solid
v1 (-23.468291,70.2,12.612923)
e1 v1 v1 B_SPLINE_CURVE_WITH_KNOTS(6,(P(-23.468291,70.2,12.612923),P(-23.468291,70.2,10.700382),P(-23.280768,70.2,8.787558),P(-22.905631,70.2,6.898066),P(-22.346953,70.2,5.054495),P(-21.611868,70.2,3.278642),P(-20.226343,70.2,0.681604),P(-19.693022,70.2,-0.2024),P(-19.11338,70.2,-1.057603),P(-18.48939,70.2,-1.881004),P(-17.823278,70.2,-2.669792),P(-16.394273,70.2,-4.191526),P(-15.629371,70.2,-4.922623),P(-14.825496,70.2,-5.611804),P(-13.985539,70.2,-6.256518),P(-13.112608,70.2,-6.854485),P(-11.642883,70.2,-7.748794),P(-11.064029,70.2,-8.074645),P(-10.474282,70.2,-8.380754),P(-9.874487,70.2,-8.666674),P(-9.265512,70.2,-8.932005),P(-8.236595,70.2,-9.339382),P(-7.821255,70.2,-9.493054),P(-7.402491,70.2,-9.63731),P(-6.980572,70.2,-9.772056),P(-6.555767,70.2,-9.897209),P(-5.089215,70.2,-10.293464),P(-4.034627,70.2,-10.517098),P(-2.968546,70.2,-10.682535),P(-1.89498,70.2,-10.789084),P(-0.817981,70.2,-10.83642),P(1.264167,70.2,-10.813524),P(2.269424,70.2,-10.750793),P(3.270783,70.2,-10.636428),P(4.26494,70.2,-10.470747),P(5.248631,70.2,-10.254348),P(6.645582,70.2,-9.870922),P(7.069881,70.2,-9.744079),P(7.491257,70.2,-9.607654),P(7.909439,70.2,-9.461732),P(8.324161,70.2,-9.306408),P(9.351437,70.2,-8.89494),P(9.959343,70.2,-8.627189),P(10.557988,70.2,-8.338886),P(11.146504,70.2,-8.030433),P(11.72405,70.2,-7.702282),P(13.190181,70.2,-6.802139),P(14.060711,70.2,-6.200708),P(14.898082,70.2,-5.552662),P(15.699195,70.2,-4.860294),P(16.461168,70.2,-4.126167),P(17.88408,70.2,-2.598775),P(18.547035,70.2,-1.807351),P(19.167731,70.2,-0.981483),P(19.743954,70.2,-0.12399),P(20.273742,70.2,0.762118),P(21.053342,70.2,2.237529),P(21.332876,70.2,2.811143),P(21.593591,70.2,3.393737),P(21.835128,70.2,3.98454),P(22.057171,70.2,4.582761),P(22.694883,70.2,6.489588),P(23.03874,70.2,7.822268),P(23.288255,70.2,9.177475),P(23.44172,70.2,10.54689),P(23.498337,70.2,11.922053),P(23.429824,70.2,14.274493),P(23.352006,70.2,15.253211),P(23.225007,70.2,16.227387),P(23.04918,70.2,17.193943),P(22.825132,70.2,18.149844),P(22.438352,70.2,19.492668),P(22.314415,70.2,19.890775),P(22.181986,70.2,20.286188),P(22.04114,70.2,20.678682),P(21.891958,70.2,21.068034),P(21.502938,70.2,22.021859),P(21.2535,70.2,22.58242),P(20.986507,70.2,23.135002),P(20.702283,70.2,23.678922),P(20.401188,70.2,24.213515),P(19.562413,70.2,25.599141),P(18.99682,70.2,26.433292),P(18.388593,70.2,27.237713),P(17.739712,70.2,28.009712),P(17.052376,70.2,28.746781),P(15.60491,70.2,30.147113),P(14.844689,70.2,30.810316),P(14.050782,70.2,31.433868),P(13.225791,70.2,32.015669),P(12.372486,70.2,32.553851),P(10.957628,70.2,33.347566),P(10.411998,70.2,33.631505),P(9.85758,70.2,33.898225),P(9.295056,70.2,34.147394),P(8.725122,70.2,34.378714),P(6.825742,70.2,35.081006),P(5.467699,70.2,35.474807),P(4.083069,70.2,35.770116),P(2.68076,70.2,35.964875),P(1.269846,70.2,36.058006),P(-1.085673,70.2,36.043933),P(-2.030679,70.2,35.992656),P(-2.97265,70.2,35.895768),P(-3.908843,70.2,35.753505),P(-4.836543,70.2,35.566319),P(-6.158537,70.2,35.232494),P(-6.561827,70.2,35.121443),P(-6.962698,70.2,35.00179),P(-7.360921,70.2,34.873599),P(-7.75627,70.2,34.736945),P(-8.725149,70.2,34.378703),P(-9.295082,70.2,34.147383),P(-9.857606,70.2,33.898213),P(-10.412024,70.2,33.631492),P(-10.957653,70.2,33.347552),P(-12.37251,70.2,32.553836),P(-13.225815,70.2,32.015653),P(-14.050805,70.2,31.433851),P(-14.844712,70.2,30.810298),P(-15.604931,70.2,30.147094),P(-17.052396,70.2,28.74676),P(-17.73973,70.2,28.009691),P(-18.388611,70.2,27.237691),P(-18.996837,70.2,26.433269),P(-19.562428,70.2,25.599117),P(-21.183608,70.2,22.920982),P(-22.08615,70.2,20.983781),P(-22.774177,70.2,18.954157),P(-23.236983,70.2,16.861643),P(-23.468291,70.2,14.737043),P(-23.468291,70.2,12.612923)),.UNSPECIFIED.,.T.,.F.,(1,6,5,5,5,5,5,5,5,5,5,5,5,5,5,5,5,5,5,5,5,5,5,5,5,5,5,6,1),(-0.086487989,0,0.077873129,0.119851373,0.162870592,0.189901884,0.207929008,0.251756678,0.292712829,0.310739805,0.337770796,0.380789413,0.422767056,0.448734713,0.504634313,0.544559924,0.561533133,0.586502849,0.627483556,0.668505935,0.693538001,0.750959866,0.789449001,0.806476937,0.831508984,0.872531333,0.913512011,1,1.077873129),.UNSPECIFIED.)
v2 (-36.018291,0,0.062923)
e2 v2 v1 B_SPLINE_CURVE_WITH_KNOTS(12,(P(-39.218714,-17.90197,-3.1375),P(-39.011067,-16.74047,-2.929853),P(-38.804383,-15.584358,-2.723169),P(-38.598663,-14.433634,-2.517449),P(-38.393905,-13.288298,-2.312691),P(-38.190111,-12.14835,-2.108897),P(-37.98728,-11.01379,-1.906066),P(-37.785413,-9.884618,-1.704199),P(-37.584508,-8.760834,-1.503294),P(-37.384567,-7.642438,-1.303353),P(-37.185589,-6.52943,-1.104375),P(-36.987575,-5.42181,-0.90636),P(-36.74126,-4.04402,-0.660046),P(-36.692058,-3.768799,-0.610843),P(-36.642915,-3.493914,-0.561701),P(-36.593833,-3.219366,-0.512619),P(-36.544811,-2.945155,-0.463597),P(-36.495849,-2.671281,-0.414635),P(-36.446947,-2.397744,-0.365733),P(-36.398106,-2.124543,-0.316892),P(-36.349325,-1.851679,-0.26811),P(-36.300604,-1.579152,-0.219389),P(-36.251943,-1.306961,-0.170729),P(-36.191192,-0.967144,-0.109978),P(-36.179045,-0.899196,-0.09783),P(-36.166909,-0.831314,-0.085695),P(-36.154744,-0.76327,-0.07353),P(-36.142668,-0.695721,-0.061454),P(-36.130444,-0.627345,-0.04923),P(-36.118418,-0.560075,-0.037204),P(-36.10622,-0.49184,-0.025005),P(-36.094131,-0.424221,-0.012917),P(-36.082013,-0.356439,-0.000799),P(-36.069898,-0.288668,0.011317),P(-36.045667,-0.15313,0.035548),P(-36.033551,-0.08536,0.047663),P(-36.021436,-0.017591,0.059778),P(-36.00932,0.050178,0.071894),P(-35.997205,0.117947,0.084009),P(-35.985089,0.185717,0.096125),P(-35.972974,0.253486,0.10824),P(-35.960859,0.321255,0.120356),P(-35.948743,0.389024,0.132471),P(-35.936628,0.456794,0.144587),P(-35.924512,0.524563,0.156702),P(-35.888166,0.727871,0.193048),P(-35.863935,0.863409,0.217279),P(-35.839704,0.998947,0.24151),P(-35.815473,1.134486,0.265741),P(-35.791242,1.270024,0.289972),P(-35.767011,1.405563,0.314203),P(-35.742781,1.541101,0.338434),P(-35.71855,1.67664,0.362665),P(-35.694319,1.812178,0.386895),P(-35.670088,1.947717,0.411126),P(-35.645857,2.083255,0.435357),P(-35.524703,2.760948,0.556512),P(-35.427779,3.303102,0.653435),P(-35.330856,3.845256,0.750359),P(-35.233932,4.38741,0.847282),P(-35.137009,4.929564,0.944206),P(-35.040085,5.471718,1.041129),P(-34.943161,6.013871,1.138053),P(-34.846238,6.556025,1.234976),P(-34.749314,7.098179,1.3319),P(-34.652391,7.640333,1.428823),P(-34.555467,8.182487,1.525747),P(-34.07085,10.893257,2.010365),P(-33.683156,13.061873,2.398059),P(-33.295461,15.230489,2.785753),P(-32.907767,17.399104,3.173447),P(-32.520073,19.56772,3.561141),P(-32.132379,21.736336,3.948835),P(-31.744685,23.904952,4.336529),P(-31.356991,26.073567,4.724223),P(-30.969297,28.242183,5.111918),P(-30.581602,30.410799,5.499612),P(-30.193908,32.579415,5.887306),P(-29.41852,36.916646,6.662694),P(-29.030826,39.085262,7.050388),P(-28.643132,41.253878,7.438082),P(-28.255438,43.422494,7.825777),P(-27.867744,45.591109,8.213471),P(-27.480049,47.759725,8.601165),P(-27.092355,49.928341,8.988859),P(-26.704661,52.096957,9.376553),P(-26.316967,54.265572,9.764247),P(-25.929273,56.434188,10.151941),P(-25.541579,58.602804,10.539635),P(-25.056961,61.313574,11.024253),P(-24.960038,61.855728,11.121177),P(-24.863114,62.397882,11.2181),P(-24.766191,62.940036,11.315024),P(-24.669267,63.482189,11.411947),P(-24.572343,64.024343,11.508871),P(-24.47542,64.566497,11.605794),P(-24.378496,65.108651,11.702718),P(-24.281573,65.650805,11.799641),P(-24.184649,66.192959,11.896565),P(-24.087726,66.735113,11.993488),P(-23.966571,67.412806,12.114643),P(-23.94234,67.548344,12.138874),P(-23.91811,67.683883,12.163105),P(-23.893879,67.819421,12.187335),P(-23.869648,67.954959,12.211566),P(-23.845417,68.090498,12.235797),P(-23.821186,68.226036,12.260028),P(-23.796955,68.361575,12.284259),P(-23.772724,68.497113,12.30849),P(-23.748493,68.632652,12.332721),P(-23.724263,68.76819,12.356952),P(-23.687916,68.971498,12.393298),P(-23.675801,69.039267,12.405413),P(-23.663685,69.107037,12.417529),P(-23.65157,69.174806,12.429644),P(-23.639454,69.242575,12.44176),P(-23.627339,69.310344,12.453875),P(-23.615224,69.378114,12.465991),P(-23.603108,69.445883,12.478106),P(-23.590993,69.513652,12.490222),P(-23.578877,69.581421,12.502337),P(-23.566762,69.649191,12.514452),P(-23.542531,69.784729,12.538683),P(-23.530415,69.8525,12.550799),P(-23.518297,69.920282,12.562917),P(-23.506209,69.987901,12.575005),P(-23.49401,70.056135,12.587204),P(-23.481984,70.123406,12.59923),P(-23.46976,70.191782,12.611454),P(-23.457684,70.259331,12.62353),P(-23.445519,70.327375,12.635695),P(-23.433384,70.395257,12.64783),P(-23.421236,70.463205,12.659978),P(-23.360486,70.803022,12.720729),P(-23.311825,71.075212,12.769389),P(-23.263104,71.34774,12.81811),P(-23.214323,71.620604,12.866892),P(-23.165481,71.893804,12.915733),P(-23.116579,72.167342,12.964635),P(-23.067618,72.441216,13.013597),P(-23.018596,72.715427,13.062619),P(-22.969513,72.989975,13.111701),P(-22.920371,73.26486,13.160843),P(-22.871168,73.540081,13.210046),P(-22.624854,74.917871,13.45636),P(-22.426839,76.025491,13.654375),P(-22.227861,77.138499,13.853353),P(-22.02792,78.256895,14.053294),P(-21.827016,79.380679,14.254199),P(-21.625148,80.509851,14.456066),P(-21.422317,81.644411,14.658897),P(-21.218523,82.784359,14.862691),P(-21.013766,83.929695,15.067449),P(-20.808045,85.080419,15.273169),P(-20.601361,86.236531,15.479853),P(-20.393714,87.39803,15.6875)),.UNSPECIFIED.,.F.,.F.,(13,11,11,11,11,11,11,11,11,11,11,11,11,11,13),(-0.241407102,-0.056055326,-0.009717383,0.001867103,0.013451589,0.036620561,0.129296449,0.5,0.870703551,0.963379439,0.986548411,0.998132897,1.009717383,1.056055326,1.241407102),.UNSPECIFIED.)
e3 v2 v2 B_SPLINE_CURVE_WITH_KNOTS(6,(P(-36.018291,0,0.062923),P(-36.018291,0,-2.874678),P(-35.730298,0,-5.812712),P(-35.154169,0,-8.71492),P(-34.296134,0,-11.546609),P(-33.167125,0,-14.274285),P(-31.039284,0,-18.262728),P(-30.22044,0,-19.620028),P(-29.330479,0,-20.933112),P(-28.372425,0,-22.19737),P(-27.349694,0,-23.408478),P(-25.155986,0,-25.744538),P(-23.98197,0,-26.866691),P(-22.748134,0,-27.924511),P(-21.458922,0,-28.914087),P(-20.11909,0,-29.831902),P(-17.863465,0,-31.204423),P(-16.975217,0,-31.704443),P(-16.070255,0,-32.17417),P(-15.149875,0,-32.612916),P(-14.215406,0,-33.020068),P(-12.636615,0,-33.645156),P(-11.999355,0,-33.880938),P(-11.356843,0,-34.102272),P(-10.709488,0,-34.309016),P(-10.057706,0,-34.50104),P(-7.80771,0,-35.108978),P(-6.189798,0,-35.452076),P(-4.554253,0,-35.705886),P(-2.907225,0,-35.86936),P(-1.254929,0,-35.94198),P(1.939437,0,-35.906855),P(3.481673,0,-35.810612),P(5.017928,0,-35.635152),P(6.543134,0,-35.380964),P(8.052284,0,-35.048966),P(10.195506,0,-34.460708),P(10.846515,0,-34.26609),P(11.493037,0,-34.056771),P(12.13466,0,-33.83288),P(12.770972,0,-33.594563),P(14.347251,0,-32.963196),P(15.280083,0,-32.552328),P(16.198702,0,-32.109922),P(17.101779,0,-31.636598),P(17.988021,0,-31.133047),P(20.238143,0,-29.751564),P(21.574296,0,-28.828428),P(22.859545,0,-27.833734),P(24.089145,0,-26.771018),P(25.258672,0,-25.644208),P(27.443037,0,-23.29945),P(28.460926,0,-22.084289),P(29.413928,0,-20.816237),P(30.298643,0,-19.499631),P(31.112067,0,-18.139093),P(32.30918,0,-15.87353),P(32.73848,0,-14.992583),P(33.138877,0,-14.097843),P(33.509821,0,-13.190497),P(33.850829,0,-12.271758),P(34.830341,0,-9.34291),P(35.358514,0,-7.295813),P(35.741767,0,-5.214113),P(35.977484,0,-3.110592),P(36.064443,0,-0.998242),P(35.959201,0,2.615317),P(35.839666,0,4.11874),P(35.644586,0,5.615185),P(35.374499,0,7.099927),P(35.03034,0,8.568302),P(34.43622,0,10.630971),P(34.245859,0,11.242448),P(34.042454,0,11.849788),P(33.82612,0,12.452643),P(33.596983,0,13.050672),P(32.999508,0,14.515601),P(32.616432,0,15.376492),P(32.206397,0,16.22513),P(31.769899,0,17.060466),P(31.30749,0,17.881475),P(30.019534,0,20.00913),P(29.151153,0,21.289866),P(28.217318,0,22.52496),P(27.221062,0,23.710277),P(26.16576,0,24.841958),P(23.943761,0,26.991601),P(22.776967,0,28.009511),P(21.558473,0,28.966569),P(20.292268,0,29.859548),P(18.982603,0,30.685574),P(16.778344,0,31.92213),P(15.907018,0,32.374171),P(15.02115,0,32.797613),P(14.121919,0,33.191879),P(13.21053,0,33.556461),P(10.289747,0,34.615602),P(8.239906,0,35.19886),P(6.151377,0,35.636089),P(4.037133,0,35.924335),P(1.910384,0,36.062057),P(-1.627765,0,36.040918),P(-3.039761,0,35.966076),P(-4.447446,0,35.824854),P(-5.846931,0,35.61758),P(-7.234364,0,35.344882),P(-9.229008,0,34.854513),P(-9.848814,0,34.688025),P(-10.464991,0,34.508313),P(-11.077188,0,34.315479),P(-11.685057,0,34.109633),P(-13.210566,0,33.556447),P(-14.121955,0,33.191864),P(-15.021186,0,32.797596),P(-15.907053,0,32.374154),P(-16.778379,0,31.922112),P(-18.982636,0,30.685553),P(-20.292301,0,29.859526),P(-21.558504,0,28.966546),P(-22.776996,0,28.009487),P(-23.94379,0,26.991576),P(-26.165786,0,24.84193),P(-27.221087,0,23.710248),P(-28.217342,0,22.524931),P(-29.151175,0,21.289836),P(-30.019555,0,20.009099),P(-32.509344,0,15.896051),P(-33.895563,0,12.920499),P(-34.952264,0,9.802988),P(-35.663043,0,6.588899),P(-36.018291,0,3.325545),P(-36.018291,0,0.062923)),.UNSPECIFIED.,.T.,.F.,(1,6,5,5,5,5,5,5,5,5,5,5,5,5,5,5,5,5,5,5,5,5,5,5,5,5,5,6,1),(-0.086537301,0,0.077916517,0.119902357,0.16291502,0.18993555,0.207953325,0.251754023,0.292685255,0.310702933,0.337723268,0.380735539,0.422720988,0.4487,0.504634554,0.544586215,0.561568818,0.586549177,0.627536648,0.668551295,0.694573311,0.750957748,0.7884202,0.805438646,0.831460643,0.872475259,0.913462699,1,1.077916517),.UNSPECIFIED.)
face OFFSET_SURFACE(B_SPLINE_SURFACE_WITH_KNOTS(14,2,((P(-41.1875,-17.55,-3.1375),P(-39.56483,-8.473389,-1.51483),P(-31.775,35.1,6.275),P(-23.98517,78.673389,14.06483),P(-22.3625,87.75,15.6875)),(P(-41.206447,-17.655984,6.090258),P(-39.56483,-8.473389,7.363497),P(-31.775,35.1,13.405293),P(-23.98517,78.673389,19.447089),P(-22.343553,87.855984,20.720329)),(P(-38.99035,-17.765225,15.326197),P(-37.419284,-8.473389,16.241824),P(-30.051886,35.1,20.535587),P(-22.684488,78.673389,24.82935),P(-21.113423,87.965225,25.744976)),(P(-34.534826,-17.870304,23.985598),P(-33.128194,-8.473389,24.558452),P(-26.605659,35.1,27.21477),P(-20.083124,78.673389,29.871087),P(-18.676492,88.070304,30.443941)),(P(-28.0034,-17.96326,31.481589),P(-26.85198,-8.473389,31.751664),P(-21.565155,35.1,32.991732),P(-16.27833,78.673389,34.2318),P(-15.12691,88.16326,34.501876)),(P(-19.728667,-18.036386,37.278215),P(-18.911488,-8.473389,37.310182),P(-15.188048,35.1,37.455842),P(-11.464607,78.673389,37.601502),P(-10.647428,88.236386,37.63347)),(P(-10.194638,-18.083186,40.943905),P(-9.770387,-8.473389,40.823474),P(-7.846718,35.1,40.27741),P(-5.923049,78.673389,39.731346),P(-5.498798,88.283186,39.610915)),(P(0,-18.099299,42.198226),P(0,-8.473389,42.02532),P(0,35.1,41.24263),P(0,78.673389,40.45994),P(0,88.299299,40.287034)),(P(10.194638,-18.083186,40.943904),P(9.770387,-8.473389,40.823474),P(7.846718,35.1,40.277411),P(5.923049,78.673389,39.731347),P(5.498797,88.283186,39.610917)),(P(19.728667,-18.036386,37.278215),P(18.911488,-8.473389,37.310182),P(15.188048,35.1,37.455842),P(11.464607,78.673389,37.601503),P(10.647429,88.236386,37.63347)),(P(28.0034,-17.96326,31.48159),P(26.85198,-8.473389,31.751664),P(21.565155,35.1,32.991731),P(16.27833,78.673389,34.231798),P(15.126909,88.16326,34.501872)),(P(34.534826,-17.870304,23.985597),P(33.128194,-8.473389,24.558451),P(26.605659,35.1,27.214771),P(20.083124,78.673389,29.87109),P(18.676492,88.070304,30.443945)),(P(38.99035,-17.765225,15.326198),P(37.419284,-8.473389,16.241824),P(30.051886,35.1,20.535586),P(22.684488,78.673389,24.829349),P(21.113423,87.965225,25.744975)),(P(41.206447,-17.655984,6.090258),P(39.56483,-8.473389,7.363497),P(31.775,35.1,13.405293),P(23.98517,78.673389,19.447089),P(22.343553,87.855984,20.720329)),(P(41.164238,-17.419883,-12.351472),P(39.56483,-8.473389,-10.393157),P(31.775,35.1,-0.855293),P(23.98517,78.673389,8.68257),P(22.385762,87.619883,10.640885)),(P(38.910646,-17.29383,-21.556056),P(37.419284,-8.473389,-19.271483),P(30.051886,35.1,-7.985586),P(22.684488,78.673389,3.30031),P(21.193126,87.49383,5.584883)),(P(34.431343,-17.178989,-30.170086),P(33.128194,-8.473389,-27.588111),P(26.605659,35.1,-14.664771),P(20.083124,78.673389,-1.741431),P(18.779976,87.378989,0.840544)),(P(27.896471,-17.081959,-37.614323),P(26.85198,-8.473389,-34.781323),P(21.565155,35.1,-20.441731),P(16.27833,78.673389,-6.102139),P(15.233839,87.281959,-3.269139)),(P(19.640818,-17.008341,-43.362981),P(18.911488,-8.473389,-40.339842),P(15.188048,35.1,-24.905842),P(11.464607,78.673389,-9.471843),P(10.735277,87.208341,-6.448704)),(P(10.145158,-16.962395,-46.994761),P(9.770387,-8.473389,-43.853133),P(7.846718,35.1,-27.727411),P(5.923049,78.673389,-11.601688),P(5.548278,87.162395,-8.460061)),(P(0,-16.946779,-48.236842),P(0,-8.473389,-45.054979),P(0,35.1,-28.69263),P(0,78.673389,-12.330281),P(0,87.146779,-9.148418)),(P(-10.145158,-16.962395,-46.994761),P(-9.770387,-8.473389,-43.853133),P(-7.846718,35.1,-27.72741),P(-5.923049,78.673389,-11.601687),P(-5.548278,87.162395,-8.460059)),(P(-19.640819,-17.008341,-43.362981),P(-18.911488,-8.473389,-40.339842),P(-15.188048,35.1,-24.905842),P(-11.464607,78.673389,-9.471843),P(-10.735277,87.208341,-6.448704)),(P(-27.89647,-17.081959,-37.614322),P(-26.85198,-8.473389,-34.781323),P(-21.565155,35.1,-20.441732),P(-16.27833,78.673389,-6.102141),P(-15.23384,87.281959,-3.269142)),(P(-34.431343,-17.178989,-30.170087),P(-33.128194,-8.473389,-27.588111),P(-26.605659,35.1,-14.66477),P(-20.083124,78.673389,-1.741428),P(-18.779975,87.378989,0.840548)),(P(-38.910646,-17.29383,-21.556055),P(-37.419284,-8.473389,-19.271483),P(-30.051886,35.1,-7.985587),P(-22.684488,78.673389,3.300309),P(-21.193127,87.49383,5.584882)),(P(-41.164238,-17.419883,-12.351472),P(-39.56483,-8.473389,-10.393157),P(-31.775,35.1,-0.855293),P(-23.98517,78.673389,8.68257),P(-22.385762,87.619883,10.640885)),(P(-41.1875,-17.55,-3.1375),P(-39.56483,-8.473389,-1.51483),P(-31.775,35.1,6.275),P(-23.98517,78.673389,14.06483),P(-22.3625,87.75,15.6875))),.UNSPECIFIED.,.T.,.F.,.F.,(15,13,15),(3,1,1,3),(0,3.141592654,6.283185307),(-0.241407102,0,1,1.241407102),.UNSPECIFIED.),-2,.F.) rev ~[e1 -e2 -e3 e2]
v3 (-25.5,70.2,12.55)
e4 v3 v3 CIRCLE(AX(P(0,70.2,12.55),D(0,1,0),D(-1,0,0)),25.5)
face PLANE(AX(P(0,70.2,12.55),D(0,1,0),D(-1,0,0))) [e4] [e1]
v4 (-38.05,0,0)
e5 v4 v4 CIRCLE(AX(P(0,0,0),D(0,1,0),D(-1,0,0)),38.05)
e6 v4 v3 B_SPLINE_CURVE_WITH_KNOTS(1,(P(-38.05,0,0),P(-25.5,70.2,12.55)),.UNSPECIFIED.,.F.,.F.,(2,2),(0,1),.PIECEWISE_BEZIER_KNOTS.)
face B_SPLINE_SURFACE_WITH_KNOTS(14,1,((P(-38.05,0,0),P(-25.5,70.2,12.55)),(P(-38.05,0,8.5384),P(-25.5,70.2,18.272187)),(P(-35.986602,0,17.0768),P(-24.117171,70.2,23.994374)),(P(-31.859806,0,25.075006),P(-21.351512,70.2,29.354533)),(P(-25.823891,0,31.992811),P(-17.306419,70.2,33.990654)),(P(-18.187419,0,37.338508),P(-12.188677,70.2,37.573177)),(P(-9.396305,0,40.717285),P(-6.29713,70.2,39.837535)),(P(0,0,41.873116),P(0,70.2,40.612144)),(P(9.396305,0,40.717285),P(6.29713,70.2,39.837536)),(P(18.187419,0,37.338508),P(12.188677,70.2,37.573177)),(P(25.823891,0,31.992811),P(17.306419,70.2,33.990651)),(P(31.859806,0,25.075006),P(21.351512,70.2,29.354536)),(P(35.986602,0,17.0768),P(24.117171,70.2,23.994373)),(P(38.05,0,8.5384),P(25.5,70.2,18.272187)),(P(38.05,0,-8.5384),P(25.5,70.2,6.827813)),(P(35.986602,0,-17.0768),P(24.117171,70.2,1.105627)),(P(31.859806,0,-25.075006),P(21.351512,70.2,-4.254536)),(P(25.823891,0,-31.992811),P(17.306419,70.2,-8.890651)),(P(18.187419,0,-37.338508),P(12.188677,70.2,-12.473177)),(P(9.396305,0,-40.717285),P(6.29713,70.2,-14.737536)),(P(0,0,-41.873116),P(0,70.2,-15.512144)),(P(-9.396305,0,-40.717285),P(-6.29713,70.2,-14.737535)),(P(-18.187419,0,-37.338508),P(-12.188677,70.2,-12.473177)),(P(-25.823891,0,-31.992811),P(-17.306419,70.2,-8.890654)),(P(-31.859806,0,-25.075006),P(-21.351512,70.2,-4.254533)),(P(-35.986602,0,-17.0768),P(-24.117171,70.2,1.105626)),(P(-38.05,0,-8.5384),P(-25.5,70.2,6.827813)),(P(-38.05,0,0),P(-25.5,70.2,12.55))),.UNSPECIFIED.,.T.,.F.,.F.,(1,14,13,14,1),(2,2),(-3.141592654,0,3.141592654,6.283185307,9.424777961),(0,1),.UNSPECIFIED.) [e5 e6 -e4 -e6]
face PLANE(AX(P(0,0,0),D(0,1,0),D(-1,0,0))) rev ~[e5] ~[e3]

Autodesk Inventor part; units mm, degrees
ref_plane "YZ Plane" through (0, 0, 0) normal (1, 0, 0) x (0, 1, 0)
ref_plane "XY Plane" through (0, 0, 0) normal (0, 0, 1) x (1, 0, 0)
sketch "Szkic6" plane through (0, 0, 0) normal (0, 1, 0) x (-1, 0, 0)
  circle A0 centre (0, 0) radius 38.05
  dimension "d33" = 76.1
ref_plane "Płaszczyzna konstrukcyjna1" through (0, 70.2, 0) normal (0, 1, 0) x (-1, 0, 0)
sketch "Szkic7" plane through (0, 70.2, 0) normal (0, 1, 0) x (-1, 0, 0)
  circle A0 centre (0, 12.55) radius 25.5
  line L0 (0, -20.3) -> (0, 20.3) construction
  circle A1 centre (0, 0) radius 38.05 construction
  dimension "d35" = 51
loft "Wyciągnięcie złożone1" add profiles "Szkic6", "Szkic7"
shell "Skorupa1" thickness 2 removed faces 2 at (3.0141, 70.2, 6.5069) at (-5.8996, 0, 7.9079)
equation "\"d33\" = OD1"
equation "\"d35\" = OD2"
equation "\"d52\" = THK"
equation "\"SzerokośćGięciaPodcięcia\" = Grubość"
equation "\"RozmiarPodcięciaNarożnika\" = 4 * Grubość"
equation "\"PromieńPrzejścia\" = PromieńGięcia"
equation "\"Rozmiar_promienia_Jacobiego\" = PromieńGięcia"
equation "\"Wielk_odstępu\" = Grubość"
equation "\"d2\" = PromieńGięcia"
equation "\"d23\" = PromieńGięcia"
equation "\"OD1\" = 76.1"
equation "\"OD2\" = 51"
equation "\"L\" = 70.2"
equation "\"THK\" = 2"
equation "\"d34\" = L"
equation "\"Grubość\" = 1.5"
equation "\"PromieńGięcia\" = 3"
properties part number "Redukcja asymetryczna Ø76,1x51x2 L=70,2" material "304"
